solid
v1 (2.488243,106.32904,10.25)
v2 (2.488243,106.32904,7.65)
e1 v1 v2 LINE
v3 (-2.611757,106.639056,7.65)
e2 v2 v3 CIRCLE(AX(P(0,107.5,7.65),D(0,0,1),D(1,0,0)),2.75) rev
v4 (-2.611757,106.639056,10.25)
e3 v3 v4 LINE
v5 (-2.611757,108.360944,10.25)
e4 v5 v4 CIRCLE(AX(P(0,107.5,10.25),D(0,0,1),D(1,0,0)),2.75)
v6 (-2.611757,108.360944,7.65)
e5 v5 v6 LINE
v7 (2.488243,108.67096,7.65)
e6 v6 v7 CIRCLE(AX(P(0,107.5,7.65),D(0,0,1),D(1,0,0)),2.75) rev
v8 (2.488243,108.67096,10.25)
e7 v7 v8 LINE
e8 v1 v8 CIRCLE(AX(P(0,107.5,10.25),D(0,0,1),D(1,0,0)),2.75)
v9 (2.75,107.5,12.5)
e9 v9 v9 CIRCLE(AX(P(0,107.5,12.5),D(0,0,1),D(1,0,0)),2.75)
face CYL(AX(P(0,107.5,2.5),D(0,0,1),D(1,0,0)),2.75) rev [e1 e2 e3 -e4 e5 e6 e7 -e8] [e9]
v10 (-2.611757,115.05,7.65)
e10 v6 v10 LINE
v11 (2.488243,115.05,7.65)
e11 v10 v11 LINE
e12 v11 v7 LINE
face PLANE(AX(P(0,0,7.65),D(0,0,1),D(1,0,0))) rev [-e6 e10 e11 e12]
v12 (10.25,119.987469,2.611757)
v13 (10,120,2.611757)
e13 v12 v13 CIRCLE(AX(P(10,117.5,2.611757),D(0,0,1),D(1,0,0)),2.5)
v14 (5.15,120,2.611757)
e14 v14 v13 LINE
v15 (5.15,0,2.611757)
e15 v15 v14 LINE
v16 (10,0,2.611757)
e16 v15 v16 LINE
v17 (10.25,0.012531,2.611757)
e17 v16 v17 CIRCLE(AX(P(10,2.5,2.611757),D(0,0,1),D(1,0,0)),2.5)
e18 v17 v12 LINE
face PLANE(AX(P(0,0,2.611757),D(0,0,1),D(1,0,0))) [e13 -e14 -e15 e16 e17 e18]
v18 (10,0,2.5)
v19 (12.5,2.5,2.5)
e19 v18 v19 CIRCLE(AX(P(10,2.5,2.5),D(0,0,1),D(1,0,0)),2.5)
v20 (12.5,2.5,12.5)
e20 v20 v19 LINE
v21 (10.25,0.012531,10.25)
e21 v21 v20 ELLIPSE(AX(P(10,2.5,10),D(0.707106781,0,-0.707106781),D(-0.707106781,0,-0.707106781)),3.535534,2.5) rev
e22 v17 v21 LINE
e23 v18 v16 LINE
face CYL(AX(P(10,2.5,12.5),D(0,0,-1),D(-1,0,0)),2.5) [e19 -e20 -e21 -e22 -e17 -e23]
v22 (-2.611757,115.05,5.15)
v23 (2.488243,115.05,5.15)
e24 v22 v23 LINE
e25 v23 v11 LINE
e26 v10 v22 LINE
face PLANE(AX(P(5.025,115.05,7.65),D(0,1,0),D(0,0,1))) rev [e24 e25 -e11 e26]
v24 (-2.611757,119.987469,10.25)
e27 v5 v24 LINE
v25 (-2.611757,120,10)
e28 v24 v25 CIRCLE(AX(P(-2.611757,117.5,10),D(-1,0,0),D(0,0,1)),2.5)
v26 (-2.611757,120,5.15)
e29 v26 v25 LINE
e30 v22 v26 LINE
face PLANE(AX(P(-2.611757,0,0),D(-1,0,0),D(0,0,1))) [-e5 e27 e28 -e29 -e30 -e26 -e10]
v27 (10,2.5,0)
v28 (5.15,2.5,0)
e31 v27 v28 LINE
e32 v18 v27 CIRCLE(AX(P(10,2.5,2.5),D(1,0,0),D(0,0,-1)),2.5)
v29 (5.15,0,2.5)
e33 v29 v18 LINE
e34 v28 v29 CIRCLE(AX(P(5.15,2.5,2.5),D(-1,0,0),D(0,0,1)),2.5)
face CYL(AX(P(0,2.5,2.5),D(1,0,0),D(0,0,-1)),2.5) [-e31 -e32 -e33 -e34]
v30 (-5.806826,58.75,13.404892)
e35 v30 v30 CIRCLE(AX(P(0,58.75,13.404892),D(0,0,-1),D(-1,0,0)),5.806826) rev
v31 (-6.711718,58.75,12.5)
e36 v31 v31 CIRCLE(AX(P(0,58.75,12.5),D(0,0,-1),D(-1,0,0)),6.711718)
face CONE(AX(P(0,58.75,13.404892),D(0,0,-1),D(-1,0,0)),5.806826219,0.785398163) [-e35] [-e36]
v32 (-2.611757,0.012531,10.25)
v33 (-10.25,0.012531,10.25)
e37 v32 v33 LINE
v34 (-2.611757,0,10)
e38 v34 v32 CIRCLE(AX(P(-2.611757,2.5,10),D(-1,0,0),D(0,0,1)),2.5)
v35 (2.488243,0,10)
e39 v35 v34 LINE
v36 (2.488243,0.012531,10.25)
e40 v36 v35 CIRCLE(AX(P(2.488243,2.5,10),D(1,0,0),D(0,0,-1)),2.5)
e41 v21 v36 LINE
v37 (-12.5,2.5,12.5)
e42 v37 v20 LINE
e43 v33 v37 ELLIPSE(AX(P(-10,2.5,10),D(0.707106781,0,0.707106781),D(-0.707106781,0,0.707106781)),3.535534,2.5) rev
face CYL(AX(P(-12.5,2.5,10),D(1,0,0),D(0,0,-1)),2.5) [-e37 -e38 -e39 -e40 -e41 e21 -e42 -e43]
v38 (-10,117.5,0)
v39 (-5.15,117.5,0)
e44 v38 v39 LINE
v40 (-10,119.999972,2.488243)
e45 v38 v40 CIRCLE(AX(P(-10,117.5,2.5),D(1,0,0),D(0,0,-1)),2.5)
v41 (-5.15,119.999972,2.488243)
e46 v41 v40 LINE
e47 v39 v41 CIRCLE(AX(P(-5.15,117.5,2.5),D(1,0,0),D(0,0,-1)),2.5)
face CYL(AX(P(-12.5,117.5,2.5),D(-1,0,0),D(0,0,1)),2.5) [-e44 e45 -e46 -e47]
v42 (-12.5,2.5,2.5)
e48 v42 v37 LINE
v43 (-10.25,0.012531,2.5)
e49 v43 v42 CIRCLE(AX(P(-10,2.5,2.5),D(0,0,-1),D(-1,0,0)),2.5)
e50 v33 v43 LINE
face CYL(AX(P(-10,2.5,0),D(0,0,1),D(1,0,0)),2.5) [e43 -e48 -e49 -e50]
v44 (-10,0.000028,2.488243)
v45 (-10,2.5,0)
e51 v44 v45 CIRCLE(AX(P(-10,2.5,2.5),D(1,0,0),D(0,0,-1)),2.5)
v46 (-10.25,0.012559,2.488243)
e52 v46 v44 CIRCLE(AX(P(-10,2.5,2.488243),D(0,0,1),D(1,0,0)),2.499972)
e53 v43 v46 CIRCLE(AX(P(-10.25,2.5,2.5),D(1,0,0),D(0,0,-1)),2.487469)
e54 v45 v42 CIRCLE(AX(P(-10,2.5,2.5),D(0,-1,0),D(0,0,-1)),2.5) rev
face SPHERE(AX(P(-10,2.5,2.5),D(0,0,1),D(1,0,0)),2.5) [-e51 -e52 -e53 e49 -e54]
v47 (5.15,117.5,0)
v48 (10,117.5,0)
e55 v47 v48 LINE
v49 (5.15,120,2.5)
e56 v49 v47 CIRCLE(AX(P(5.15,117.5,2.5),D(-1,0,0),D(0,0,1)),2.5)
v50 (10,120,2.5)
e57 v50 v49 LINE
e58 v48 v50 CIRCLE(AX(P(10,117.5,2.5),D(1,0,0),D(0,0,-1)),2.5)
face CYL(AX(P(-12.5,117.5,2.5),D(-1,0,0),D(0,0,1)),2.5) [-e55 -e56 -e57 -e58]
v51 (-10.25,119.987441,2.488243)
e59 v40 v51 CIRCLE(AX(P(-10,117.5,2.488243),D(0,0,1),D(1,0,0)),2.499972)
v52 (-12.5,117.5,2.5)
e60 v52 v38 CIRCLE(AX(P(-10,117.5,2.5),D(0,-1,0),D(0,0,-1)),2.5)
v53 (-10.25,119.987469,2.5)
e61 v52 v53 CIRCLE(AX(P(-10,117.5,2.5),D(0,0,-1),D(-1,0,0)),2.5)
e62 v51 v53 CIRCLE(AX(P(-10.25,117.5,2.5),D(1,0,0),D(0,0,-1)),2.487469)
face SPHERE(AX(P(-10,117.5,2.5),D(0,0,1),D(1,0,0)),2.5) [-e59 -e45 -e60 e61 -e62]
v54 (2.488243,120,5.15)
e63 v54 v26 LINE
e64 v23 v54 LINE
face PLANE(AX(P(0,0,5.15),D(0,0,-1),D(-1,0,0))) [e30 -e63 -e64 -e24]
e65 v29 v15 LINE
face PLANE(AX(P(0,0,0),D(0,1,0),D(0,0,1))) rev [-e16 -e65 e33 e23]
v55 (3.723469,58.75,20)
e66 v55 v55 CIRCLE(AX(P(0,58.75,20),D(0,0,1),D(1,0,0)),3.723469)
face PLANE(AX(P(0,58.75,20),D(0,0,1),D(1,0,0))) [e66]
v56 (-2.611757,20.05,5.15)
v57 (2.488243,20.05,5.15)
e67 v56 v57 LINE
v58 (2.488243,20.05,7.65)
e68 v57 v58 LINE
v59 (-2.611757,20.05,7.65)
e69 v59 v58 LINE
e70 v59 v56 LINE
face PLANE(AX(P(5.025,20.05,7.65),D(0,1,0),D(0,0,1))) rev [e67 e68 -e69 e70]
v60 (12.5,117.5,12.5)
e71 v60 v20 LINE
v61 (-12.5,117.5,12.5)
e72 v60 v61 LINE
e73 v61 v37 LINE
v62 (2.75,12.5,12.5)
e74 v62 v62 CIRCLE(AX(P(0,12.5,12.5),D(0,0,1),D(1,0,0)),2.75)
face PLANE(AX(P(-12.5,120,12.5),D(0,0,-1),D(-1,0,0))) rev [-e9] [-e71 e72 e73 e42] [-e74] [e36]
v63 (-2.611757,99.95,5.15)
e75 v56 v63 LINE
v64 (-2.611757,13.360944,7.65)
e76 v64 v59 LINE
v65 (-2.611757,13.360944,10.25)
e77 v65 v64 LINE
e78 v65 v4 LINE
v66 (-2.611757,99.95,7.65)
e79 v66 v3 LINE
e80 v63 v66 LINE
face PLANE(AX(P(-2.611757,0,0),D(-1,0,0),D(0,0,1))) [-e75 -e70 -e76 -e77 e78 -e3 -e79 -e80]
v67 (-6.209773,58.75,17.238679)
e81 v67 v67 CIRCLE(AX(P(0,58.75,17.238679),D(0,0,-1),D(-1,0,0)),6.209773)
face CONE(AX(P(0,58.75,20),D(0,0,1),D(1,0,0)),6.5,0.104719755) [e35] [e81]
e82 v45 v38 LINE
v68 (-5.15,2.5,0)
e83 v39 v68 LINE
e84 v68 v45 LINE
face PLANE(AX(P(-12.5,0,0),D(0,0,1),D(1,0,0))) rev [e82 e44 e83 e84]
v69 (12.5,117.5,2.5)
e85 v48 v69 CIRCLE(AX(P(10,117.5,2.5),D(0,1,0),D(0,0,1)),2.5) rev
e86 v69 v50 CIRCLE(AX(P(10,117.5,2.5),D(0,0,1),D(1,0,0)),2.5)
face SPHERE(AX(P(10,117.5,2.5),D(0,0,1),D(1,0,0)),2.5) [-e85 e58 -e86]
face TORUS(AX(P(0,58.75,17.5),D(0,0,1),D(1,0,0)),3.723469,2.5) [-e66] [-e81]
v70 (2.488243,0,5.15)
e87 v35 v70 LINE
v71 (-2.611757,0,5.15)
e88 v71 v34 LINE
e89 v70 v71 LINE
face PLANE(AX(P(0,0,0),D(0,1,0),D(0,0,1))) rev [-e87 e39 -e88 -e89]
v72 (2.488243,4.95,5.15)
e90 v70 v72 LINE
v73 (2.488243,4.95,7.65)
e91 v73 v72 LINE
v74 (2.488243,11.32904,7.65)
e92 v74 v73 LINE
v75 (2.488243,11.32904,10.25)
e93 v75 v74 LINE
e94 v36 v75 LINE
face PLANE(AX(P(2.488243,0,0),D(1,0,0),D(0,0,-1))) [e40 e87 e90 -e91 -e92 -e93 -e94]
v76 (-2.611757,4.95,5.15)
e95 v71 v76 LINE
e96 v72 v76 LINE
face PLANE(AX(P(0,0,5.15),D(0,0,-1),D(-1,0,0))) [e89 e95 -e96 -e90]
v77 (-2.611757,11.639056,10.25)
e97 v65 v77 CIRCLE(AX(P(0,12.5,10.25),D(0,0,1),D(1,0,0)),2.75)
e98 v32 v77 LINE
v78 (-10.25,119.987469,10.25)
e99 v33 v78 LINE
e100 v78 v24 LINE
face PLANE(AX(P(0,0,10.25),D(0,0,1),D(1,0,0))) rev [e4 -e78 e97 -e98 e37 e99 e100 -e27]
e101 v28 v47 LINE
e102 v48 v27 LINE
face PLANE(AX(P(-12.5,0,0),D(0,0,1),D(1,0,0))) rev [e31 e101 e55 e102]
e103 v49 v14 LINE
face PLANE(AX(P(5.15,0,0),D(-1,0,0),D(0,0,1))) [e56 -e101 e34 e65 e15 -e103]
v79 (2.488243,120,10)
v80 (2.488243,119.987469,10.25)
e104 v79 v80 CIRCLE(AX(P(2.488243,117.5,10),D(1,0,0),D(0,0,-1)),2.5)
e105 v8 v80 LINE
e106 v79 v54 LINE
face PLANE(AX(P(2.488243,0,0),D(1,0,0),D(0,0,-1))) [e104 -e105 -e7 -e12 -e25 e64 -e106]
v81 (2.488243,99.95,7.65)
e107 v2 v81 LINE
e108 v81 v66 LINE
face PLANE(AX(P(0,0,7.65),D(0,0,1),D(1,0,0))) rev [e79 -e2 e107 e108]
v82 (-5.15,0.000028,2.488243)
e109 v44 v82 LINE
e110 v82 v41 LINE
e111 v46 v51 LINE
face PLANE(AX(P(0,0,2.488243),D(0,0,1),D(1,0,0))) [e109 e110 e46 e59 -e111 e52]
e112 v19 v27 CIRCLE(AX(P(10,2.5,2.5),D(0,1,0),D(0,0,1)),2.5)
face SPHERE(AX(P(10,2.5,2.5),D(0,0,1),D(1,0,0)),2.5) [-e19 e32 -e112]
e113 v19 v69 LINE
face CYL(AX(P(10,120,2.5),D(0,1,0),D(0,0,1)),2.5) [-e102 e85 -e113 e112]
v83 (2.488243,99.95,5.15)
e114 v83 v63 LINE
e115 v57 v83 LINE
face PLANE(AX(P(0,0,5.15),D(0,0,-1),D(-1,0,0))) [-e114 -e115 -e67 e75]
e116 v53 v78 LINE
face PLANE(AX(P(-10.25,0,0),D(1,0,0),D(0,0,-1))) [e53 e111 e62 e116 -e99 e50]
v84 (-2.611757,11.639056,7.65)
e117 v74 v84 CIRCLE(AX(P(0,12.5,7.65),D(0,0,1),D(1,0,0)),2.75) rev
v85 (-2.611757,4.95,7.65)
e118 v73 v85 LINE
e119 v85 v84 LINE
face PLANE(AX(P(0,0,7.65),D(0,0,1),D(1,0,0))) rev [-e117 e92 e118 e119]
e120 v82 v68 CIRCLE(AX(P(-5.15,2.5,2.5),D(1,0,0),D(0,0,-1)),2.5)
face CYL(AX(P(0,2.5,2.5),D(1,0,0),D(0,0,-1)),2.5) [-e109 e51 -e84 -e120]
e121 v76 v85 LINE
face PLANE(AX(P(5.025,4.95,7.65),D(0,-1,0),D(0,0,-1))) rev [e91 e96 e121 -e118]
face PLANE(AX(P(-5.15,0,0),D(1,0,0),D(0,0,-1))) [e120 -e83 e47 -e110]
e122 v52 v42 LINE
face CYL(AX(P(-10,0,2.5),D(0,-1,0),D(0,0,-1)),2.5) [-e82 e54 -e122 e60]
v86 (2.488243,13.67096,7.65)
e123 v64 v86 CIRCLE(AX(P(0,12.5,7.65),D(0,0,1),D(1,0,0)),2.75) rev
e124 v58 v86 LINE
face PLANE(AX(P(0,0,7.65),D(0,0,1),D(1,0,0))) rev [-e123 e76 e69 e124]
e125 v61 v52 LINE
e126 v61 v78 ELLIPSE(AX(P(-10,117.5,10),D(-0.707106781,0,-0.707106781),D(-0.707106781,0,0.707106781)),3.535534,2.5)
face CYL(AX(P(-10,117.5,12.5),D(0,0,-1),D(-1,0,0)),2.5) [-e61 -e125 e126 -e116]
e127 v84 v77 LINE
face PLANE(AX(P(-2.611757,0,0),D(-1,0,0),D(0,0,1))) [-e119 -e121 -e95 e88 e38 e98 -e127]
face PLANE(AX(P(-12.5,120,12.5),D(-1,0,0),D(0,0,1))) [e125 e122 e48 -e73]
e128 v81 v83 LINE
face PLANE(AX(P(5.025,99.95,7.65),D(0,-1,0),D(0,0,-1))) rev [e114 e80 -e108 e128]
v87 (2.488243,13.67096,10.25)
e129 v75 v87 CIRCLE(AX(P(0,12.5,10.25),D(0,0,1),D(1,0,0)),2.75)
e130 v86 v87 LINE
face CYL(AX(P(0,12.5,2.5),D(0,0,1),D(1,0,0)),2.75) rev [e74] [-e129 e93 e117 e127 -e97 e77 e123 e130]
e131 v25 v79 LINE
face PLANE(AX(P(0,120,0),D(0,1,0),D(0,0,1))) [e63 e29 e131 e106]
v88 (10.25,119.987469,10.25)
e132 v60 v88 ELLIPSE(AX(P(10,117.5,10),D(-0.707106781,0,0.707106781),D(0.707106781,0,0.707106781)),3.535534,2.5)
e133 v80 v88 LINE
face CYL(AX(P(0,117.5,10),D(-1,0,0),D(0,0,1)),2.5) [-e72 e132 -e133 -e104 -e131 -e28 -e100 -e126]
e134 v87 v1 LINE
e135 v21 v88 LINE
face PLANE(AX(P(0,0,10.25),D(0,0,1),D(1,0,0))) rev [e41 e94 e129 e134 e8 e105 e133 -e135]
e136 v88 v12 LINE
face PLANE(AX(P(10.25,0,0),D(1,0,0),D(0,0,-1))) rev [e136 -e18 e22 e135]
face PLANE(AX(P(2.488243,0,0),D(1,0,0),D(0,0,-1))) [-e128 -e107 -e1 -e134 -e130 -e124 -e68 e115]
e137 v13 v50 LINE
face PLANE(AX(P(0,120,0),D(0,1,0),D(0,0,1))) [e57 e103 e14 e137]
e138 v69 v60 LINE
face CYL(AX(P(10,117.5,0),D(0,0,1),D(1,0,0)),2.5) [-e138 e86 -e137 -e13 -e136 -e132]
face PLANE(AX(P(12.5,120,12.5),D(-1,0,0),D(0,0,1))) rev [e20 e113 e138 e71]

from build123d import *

# Parameters (mm, degrees)
SKETCH1_W           = 25
SKETCH1_H           = 25
BOSS_EXTRUDE1_DEPTH = 120
CUT_EXTRUDE1_DEPTH  = 120
SKETCH3_W           = 25
SKETCH3_H           = 12.5
CUT_EXTRUDE2_DEPTH  = 120
FILLET1_R           = 2.5
FILLET2_R           = 2.5
FILLET3_R           = 2.5
SKETCH6_R           = 2.75
CUT_EXTRUDE3_DEPTH  = 10
SKETCH7_W           = 10.05
SKETCH7_H           = 15.1
CUT_EXTRUDE4_DEPTH  = 2.5
SKETCH9_R           = 6.5
BOSS_EXTRUDE3_DEPTH = 7.5
BOSS_EXTRUDE3_DRAFT = -6
FILLET4_R           = 2.5
CHAMFER1_SIZE       = 1
CHAMFER1_SIZE2      = 0.909876415


with BuildPart() as part:
    # Sketch1 → Boss-Extrude1 (new body)
    with BuildSketch(Plane(origin=(0, 0, 0), x_dir=(1, 0, 0), z_dir=(0, 1, 0))):
        Rectangle(SKETCH1_W, SKETCH1_H)
    extrude(amount=BOSS_EXTRUDE1_DEPTH)

    # Sketch2 → Cut-Extrude1 (cut)
    with BuildSketch(Plane(origin=(0, 120, 0), x_dir=(1, 0, 0), z_dir=(0, 1, 0))):
        Polygon((-10.25, -2.48824277), (-10.25, -10.25), (-2.61175723, -10.25), (-2.61175723, -5.15), (2.48824277, -5.15), (2.48824277, -10.25), (10.25, -10.25), (10.25, -2.61175723), (5.15, -2.61175723), (5.15, 2.48824277), (10.25, 2.48824277), (10.25, 10.25), (2.61175723, 10.25), (2.61175723, 5.15), (-2.48824277, 5.15), (-2.48824277, 10.25), (-10.25, 10.25), (-10.25, 2.61175723), (-5.15, 2.61175723), (-5.15, -2.48824277), align=None)
    extrude(amount=-CUT_EXTRUDE1_DEPTH, mode=Mode.SUBTRACT)

    # Sketch3 → Cut-Extrude2 (cut)
    with BuildSketch(Plane(origin=(0, 120, 0), x_dir=(1, 0, 0), z_dir=(0, 1, 0))):
        with Locations((0, 6.25)):
            Rectangle(SKETCH3_W, SKETCH3_H)
    extrude(amount=-CUT_EXTRUDE2_DEPTH, mode=Mode.SUBTRACT)

    # Fillet1
    fillet1_edges = [part.edges().sort_by_distance(p)[0] for p in [
        (-12.5, 60, 0),
    ]]
    fillet(fillet1_edges, radius=FILLET1_R)

    # Fillet2
    fillet2_edges = [part.edges().sort_by_distance(p)[0] for p in [
        (12.5, 60, 0),
    ]]
    fillet(fillet2_edges, radius=FILLET2_R)

    # Fillet3
    # the kernel refuses this fillet: 2.5 mm, written as the material it takes off along each edge
    with BuildSketch(Plane(origin=(-10, 0, 0), x_dir=(0, 0, 1), z_dir=(1, 0, 0)), Plane(origin=(-1.1, 0, 0), x_dir=(0, 0, 1), z_dir=(1, 0, 0)), Plane(origin=(-10, 120, 0), x_dir=(0, -1, 0), z_dir=(1, 0, 0)), Plane(origin=(-1.1, 120, 0), x_dir=(0, -1, 0), z_dir=(1, 0, 0))) as fillet3_piece_1:
        with BuildLine():
            CenterArc((FILLET3_R, -FILLET3_R), FILLET3_R, 90, 90)
            Line((0, -FILLET3_R), (0, 0))
            Line((0, 0), (FILLET3_R, 0))
        make_face()
    extrude(amount=11.1, mode=Mode.SUBTRACT)
    with BuildSketch(Plane(origin=(-10, 0, 2.5), x_dir=(-1, 0, 0), z_dir=(0, 0, 1))) as fillet3_piece_2:
        with BuildLine():
            CenterArc((2.5 - FILLET3_R, -FILLET3_R), FILLET3_R, 0, 90)
            Line((2.5, -FILLET3_R), (2.5, 0))
            Line((2.5, 0), (2.5 - FILLET3_R, 0))
        make_face()
    revolve(axis=Axis((-10, 0, 2.5), (0, -1, 0)), revolution_arc=90, mode=Mode.SUBTRACT)
    with BuildSketch(Plane(origin=(10, 0, 2.5), x_dir=(1, 0, 0), z_dir=(0, 0, 1))) as fillet3_piece_3:
        with BuildLine():
            CenterArc((2.5 - FILLET3_R, FILLET3_R), FILLET3_R, 270, 90)
            Line((2.5, FILLET3_R), (2.5, 0))
            Line((2.5, 0), (2.5 - FILLET3_R, 0))
        make_face()
    revolve(axis=Axis((10, 0, 2.5), (0, 1, 0)), revolution_arc=90, mode=Mode.SUBTRACT)
    with BuildSketch(Plane(origin=(-10, 120, 2.5), x_dir=(-1, 0, 0), z_dir=(0, 0, 1))) as fillet3_piece_4:
        with BuildLine():
            CenterArc((2.5 - FILLET3_R, FILLET3_R), FILLET3_R, 270, 90)
            Line((2.5 - FILLET3_R, 0), (2.5, 0))
            Line((2.5, 0), (2.5, FILLET3_R))
        make_face()
    revolve(axis=Axis((-10, 120, 2.5), (0, -1, 0)), revolution_arc=90, mode=Mode.SUBTRACT)
    with BuildSketch(Plane(origin=(10, 120, 2.5), x_dir=(1, 0, 0), z_dir=(0, 0, 1))) as fillet3_piece_5:
        with BuildLine():
            CenterArc((2.5 - FILLET3_R, -FILLET3_R), FILLET3_R, 0, 90)
            Line((2.5 - FILLET3_R, 0), (2.5, 0))
            Line((2.5, 0), (2.5, -FILLET3_R))
        make_face()
    revolve(axis=Axis((10, 120, 2.5), (0, 1, 0)), revolution_arc=90, mode=Mode.SUBTRACT)
    with BuildSketch(Plane(origin=(-18.75, 0, 12.5), x_dir=(0, 0, -1), z_dir=(1, 0, 0)), Plane(origin=(-18.75, 120, 12.5), x_dir=(0, -1, 0), z_dir=(1, 0, 0))) as fillet3_piece_6:
        with BuildLine():
            CenterArc((FILLET3_R, FILLET3_R), FILLET3_R, 180, 90)
            Line((0, FILLET3_R), (0, 0))
            Line((0, 0), (FILLET3_R, 0))
        make_face()
    extrude(amount=37.5, mode=Mode.SUBTRACT)
    with BuildSketch(Plane(origin=(-12.5, 0, 2.5), x_dir=(1, 0, 0), z_dir=(0, 0, 1)), Plane(origin=(12.5, 0, 18.75), x_dir=(-1, 0, 0), z_dir=(0, 0, -1)), Plane(origin=(-12.5, 120, 2.5), x_dir=(0, -1, 0), z_dir=(0, 0, 1)), Plane(origin=(12.5, 120, 18.75), x_dir=(0, -1, 0), z_dir=(0, 0, -1))) as fillet3_piece_7:
        with BuildLine():
            CenterArc((FILLET3_R, FILLET3_R), FILLET3_R, 180, 90)
            Line((0, FILLET3_R), (0, 0))
            Line((0, 0), (FILLET3_R, 0))
        make_face()
    extrude(amount=16.25, mode=Mode.SUBTRACT)

    # Sketch6 → Cut-Extrude3 (cut)
    with BuildSketch(Plane.XY.offset(12.5)):
        with Locations((0, 107.5)):
            Circle(SKETCH6_R)
        with Locations((0, 12.5)):
            Circle(SKETCH6_R)
    extrude(amount=-CUT_EXTRUDE3_DEPTH, mode=Mode.SUBTRACT)

    # Sketch7 → Cut-Extrude4 (cut)
    with BuildSketch(Plane(origin=(0, 0, 5.15), x_dir=(-1, 0, 0), z_dir=(0, 0, -1))):
        with Locations((0, 107.5)):
            Rectangle(SKETCH7_W, SKETCH7_H)
        with Locations((0, 12.5)):
            Rectangle(SKETCH7_W, SKETCH7_H)
    extrude(amount=-CUT_EXTRUDE4_DEPTH, mode=Mode.SUBTRACT)


with BuildPart() as boss_extrude3_tool:
    # Sketch9 → Boss-Extrude3 (with draft: the straight prism first)
    with BuildSketch(Plane.XY.offset(20)):
        with Locations((0, 58.75)):
            Circle(SKETCH9_R)
    extrude(amount=-BOSS_EXTRUDE3_DEPTH)
    # Boss-Extrude3: the draft: its side faces are tilted about the plane it starts from
    boss_extrude3_sides = [boss_extrude3_tool.faces().sort_by_distance(p)[0] for p in [
        (-6.5, 58.75, 16.25),
    ]]
    draft(boss_extrude3_sides, Plane.XY.offset(20), BOSS_EXTRUDE3_DRAFT)


with BuildPart() as part_1:
    add(part.part)

    # Boss-Extrude3: add boss_extrude3_tool
    add(boss_extrude3_tool.part)

    # Fillet4
    fillet4_edges = [part_1.edges().sort_by_distance(p)[0] for p in [
        (-6.5, 58.75, 20),
    ]]
    fillet(fillet4_edges, radius=FILLET4_R)

    # Chamfer1
    chamfer1_edges = [part_1.edges().sort_by_distance(p)[0] for p in [
        (-5.711718236, 58.75, 12.5),
    ]]
    chamfer1_side = [part_1.faces().sort_by_distance(p)[0] for p in [
        (0, 3.67686023, 12.5),
    ]]
    chamfer(chamfer1_edges, length=CHAMFER1_SIZE, length2=CHAMFER1_SIZE2, reference=chamfer1_side[0])


solid = part_1.part
